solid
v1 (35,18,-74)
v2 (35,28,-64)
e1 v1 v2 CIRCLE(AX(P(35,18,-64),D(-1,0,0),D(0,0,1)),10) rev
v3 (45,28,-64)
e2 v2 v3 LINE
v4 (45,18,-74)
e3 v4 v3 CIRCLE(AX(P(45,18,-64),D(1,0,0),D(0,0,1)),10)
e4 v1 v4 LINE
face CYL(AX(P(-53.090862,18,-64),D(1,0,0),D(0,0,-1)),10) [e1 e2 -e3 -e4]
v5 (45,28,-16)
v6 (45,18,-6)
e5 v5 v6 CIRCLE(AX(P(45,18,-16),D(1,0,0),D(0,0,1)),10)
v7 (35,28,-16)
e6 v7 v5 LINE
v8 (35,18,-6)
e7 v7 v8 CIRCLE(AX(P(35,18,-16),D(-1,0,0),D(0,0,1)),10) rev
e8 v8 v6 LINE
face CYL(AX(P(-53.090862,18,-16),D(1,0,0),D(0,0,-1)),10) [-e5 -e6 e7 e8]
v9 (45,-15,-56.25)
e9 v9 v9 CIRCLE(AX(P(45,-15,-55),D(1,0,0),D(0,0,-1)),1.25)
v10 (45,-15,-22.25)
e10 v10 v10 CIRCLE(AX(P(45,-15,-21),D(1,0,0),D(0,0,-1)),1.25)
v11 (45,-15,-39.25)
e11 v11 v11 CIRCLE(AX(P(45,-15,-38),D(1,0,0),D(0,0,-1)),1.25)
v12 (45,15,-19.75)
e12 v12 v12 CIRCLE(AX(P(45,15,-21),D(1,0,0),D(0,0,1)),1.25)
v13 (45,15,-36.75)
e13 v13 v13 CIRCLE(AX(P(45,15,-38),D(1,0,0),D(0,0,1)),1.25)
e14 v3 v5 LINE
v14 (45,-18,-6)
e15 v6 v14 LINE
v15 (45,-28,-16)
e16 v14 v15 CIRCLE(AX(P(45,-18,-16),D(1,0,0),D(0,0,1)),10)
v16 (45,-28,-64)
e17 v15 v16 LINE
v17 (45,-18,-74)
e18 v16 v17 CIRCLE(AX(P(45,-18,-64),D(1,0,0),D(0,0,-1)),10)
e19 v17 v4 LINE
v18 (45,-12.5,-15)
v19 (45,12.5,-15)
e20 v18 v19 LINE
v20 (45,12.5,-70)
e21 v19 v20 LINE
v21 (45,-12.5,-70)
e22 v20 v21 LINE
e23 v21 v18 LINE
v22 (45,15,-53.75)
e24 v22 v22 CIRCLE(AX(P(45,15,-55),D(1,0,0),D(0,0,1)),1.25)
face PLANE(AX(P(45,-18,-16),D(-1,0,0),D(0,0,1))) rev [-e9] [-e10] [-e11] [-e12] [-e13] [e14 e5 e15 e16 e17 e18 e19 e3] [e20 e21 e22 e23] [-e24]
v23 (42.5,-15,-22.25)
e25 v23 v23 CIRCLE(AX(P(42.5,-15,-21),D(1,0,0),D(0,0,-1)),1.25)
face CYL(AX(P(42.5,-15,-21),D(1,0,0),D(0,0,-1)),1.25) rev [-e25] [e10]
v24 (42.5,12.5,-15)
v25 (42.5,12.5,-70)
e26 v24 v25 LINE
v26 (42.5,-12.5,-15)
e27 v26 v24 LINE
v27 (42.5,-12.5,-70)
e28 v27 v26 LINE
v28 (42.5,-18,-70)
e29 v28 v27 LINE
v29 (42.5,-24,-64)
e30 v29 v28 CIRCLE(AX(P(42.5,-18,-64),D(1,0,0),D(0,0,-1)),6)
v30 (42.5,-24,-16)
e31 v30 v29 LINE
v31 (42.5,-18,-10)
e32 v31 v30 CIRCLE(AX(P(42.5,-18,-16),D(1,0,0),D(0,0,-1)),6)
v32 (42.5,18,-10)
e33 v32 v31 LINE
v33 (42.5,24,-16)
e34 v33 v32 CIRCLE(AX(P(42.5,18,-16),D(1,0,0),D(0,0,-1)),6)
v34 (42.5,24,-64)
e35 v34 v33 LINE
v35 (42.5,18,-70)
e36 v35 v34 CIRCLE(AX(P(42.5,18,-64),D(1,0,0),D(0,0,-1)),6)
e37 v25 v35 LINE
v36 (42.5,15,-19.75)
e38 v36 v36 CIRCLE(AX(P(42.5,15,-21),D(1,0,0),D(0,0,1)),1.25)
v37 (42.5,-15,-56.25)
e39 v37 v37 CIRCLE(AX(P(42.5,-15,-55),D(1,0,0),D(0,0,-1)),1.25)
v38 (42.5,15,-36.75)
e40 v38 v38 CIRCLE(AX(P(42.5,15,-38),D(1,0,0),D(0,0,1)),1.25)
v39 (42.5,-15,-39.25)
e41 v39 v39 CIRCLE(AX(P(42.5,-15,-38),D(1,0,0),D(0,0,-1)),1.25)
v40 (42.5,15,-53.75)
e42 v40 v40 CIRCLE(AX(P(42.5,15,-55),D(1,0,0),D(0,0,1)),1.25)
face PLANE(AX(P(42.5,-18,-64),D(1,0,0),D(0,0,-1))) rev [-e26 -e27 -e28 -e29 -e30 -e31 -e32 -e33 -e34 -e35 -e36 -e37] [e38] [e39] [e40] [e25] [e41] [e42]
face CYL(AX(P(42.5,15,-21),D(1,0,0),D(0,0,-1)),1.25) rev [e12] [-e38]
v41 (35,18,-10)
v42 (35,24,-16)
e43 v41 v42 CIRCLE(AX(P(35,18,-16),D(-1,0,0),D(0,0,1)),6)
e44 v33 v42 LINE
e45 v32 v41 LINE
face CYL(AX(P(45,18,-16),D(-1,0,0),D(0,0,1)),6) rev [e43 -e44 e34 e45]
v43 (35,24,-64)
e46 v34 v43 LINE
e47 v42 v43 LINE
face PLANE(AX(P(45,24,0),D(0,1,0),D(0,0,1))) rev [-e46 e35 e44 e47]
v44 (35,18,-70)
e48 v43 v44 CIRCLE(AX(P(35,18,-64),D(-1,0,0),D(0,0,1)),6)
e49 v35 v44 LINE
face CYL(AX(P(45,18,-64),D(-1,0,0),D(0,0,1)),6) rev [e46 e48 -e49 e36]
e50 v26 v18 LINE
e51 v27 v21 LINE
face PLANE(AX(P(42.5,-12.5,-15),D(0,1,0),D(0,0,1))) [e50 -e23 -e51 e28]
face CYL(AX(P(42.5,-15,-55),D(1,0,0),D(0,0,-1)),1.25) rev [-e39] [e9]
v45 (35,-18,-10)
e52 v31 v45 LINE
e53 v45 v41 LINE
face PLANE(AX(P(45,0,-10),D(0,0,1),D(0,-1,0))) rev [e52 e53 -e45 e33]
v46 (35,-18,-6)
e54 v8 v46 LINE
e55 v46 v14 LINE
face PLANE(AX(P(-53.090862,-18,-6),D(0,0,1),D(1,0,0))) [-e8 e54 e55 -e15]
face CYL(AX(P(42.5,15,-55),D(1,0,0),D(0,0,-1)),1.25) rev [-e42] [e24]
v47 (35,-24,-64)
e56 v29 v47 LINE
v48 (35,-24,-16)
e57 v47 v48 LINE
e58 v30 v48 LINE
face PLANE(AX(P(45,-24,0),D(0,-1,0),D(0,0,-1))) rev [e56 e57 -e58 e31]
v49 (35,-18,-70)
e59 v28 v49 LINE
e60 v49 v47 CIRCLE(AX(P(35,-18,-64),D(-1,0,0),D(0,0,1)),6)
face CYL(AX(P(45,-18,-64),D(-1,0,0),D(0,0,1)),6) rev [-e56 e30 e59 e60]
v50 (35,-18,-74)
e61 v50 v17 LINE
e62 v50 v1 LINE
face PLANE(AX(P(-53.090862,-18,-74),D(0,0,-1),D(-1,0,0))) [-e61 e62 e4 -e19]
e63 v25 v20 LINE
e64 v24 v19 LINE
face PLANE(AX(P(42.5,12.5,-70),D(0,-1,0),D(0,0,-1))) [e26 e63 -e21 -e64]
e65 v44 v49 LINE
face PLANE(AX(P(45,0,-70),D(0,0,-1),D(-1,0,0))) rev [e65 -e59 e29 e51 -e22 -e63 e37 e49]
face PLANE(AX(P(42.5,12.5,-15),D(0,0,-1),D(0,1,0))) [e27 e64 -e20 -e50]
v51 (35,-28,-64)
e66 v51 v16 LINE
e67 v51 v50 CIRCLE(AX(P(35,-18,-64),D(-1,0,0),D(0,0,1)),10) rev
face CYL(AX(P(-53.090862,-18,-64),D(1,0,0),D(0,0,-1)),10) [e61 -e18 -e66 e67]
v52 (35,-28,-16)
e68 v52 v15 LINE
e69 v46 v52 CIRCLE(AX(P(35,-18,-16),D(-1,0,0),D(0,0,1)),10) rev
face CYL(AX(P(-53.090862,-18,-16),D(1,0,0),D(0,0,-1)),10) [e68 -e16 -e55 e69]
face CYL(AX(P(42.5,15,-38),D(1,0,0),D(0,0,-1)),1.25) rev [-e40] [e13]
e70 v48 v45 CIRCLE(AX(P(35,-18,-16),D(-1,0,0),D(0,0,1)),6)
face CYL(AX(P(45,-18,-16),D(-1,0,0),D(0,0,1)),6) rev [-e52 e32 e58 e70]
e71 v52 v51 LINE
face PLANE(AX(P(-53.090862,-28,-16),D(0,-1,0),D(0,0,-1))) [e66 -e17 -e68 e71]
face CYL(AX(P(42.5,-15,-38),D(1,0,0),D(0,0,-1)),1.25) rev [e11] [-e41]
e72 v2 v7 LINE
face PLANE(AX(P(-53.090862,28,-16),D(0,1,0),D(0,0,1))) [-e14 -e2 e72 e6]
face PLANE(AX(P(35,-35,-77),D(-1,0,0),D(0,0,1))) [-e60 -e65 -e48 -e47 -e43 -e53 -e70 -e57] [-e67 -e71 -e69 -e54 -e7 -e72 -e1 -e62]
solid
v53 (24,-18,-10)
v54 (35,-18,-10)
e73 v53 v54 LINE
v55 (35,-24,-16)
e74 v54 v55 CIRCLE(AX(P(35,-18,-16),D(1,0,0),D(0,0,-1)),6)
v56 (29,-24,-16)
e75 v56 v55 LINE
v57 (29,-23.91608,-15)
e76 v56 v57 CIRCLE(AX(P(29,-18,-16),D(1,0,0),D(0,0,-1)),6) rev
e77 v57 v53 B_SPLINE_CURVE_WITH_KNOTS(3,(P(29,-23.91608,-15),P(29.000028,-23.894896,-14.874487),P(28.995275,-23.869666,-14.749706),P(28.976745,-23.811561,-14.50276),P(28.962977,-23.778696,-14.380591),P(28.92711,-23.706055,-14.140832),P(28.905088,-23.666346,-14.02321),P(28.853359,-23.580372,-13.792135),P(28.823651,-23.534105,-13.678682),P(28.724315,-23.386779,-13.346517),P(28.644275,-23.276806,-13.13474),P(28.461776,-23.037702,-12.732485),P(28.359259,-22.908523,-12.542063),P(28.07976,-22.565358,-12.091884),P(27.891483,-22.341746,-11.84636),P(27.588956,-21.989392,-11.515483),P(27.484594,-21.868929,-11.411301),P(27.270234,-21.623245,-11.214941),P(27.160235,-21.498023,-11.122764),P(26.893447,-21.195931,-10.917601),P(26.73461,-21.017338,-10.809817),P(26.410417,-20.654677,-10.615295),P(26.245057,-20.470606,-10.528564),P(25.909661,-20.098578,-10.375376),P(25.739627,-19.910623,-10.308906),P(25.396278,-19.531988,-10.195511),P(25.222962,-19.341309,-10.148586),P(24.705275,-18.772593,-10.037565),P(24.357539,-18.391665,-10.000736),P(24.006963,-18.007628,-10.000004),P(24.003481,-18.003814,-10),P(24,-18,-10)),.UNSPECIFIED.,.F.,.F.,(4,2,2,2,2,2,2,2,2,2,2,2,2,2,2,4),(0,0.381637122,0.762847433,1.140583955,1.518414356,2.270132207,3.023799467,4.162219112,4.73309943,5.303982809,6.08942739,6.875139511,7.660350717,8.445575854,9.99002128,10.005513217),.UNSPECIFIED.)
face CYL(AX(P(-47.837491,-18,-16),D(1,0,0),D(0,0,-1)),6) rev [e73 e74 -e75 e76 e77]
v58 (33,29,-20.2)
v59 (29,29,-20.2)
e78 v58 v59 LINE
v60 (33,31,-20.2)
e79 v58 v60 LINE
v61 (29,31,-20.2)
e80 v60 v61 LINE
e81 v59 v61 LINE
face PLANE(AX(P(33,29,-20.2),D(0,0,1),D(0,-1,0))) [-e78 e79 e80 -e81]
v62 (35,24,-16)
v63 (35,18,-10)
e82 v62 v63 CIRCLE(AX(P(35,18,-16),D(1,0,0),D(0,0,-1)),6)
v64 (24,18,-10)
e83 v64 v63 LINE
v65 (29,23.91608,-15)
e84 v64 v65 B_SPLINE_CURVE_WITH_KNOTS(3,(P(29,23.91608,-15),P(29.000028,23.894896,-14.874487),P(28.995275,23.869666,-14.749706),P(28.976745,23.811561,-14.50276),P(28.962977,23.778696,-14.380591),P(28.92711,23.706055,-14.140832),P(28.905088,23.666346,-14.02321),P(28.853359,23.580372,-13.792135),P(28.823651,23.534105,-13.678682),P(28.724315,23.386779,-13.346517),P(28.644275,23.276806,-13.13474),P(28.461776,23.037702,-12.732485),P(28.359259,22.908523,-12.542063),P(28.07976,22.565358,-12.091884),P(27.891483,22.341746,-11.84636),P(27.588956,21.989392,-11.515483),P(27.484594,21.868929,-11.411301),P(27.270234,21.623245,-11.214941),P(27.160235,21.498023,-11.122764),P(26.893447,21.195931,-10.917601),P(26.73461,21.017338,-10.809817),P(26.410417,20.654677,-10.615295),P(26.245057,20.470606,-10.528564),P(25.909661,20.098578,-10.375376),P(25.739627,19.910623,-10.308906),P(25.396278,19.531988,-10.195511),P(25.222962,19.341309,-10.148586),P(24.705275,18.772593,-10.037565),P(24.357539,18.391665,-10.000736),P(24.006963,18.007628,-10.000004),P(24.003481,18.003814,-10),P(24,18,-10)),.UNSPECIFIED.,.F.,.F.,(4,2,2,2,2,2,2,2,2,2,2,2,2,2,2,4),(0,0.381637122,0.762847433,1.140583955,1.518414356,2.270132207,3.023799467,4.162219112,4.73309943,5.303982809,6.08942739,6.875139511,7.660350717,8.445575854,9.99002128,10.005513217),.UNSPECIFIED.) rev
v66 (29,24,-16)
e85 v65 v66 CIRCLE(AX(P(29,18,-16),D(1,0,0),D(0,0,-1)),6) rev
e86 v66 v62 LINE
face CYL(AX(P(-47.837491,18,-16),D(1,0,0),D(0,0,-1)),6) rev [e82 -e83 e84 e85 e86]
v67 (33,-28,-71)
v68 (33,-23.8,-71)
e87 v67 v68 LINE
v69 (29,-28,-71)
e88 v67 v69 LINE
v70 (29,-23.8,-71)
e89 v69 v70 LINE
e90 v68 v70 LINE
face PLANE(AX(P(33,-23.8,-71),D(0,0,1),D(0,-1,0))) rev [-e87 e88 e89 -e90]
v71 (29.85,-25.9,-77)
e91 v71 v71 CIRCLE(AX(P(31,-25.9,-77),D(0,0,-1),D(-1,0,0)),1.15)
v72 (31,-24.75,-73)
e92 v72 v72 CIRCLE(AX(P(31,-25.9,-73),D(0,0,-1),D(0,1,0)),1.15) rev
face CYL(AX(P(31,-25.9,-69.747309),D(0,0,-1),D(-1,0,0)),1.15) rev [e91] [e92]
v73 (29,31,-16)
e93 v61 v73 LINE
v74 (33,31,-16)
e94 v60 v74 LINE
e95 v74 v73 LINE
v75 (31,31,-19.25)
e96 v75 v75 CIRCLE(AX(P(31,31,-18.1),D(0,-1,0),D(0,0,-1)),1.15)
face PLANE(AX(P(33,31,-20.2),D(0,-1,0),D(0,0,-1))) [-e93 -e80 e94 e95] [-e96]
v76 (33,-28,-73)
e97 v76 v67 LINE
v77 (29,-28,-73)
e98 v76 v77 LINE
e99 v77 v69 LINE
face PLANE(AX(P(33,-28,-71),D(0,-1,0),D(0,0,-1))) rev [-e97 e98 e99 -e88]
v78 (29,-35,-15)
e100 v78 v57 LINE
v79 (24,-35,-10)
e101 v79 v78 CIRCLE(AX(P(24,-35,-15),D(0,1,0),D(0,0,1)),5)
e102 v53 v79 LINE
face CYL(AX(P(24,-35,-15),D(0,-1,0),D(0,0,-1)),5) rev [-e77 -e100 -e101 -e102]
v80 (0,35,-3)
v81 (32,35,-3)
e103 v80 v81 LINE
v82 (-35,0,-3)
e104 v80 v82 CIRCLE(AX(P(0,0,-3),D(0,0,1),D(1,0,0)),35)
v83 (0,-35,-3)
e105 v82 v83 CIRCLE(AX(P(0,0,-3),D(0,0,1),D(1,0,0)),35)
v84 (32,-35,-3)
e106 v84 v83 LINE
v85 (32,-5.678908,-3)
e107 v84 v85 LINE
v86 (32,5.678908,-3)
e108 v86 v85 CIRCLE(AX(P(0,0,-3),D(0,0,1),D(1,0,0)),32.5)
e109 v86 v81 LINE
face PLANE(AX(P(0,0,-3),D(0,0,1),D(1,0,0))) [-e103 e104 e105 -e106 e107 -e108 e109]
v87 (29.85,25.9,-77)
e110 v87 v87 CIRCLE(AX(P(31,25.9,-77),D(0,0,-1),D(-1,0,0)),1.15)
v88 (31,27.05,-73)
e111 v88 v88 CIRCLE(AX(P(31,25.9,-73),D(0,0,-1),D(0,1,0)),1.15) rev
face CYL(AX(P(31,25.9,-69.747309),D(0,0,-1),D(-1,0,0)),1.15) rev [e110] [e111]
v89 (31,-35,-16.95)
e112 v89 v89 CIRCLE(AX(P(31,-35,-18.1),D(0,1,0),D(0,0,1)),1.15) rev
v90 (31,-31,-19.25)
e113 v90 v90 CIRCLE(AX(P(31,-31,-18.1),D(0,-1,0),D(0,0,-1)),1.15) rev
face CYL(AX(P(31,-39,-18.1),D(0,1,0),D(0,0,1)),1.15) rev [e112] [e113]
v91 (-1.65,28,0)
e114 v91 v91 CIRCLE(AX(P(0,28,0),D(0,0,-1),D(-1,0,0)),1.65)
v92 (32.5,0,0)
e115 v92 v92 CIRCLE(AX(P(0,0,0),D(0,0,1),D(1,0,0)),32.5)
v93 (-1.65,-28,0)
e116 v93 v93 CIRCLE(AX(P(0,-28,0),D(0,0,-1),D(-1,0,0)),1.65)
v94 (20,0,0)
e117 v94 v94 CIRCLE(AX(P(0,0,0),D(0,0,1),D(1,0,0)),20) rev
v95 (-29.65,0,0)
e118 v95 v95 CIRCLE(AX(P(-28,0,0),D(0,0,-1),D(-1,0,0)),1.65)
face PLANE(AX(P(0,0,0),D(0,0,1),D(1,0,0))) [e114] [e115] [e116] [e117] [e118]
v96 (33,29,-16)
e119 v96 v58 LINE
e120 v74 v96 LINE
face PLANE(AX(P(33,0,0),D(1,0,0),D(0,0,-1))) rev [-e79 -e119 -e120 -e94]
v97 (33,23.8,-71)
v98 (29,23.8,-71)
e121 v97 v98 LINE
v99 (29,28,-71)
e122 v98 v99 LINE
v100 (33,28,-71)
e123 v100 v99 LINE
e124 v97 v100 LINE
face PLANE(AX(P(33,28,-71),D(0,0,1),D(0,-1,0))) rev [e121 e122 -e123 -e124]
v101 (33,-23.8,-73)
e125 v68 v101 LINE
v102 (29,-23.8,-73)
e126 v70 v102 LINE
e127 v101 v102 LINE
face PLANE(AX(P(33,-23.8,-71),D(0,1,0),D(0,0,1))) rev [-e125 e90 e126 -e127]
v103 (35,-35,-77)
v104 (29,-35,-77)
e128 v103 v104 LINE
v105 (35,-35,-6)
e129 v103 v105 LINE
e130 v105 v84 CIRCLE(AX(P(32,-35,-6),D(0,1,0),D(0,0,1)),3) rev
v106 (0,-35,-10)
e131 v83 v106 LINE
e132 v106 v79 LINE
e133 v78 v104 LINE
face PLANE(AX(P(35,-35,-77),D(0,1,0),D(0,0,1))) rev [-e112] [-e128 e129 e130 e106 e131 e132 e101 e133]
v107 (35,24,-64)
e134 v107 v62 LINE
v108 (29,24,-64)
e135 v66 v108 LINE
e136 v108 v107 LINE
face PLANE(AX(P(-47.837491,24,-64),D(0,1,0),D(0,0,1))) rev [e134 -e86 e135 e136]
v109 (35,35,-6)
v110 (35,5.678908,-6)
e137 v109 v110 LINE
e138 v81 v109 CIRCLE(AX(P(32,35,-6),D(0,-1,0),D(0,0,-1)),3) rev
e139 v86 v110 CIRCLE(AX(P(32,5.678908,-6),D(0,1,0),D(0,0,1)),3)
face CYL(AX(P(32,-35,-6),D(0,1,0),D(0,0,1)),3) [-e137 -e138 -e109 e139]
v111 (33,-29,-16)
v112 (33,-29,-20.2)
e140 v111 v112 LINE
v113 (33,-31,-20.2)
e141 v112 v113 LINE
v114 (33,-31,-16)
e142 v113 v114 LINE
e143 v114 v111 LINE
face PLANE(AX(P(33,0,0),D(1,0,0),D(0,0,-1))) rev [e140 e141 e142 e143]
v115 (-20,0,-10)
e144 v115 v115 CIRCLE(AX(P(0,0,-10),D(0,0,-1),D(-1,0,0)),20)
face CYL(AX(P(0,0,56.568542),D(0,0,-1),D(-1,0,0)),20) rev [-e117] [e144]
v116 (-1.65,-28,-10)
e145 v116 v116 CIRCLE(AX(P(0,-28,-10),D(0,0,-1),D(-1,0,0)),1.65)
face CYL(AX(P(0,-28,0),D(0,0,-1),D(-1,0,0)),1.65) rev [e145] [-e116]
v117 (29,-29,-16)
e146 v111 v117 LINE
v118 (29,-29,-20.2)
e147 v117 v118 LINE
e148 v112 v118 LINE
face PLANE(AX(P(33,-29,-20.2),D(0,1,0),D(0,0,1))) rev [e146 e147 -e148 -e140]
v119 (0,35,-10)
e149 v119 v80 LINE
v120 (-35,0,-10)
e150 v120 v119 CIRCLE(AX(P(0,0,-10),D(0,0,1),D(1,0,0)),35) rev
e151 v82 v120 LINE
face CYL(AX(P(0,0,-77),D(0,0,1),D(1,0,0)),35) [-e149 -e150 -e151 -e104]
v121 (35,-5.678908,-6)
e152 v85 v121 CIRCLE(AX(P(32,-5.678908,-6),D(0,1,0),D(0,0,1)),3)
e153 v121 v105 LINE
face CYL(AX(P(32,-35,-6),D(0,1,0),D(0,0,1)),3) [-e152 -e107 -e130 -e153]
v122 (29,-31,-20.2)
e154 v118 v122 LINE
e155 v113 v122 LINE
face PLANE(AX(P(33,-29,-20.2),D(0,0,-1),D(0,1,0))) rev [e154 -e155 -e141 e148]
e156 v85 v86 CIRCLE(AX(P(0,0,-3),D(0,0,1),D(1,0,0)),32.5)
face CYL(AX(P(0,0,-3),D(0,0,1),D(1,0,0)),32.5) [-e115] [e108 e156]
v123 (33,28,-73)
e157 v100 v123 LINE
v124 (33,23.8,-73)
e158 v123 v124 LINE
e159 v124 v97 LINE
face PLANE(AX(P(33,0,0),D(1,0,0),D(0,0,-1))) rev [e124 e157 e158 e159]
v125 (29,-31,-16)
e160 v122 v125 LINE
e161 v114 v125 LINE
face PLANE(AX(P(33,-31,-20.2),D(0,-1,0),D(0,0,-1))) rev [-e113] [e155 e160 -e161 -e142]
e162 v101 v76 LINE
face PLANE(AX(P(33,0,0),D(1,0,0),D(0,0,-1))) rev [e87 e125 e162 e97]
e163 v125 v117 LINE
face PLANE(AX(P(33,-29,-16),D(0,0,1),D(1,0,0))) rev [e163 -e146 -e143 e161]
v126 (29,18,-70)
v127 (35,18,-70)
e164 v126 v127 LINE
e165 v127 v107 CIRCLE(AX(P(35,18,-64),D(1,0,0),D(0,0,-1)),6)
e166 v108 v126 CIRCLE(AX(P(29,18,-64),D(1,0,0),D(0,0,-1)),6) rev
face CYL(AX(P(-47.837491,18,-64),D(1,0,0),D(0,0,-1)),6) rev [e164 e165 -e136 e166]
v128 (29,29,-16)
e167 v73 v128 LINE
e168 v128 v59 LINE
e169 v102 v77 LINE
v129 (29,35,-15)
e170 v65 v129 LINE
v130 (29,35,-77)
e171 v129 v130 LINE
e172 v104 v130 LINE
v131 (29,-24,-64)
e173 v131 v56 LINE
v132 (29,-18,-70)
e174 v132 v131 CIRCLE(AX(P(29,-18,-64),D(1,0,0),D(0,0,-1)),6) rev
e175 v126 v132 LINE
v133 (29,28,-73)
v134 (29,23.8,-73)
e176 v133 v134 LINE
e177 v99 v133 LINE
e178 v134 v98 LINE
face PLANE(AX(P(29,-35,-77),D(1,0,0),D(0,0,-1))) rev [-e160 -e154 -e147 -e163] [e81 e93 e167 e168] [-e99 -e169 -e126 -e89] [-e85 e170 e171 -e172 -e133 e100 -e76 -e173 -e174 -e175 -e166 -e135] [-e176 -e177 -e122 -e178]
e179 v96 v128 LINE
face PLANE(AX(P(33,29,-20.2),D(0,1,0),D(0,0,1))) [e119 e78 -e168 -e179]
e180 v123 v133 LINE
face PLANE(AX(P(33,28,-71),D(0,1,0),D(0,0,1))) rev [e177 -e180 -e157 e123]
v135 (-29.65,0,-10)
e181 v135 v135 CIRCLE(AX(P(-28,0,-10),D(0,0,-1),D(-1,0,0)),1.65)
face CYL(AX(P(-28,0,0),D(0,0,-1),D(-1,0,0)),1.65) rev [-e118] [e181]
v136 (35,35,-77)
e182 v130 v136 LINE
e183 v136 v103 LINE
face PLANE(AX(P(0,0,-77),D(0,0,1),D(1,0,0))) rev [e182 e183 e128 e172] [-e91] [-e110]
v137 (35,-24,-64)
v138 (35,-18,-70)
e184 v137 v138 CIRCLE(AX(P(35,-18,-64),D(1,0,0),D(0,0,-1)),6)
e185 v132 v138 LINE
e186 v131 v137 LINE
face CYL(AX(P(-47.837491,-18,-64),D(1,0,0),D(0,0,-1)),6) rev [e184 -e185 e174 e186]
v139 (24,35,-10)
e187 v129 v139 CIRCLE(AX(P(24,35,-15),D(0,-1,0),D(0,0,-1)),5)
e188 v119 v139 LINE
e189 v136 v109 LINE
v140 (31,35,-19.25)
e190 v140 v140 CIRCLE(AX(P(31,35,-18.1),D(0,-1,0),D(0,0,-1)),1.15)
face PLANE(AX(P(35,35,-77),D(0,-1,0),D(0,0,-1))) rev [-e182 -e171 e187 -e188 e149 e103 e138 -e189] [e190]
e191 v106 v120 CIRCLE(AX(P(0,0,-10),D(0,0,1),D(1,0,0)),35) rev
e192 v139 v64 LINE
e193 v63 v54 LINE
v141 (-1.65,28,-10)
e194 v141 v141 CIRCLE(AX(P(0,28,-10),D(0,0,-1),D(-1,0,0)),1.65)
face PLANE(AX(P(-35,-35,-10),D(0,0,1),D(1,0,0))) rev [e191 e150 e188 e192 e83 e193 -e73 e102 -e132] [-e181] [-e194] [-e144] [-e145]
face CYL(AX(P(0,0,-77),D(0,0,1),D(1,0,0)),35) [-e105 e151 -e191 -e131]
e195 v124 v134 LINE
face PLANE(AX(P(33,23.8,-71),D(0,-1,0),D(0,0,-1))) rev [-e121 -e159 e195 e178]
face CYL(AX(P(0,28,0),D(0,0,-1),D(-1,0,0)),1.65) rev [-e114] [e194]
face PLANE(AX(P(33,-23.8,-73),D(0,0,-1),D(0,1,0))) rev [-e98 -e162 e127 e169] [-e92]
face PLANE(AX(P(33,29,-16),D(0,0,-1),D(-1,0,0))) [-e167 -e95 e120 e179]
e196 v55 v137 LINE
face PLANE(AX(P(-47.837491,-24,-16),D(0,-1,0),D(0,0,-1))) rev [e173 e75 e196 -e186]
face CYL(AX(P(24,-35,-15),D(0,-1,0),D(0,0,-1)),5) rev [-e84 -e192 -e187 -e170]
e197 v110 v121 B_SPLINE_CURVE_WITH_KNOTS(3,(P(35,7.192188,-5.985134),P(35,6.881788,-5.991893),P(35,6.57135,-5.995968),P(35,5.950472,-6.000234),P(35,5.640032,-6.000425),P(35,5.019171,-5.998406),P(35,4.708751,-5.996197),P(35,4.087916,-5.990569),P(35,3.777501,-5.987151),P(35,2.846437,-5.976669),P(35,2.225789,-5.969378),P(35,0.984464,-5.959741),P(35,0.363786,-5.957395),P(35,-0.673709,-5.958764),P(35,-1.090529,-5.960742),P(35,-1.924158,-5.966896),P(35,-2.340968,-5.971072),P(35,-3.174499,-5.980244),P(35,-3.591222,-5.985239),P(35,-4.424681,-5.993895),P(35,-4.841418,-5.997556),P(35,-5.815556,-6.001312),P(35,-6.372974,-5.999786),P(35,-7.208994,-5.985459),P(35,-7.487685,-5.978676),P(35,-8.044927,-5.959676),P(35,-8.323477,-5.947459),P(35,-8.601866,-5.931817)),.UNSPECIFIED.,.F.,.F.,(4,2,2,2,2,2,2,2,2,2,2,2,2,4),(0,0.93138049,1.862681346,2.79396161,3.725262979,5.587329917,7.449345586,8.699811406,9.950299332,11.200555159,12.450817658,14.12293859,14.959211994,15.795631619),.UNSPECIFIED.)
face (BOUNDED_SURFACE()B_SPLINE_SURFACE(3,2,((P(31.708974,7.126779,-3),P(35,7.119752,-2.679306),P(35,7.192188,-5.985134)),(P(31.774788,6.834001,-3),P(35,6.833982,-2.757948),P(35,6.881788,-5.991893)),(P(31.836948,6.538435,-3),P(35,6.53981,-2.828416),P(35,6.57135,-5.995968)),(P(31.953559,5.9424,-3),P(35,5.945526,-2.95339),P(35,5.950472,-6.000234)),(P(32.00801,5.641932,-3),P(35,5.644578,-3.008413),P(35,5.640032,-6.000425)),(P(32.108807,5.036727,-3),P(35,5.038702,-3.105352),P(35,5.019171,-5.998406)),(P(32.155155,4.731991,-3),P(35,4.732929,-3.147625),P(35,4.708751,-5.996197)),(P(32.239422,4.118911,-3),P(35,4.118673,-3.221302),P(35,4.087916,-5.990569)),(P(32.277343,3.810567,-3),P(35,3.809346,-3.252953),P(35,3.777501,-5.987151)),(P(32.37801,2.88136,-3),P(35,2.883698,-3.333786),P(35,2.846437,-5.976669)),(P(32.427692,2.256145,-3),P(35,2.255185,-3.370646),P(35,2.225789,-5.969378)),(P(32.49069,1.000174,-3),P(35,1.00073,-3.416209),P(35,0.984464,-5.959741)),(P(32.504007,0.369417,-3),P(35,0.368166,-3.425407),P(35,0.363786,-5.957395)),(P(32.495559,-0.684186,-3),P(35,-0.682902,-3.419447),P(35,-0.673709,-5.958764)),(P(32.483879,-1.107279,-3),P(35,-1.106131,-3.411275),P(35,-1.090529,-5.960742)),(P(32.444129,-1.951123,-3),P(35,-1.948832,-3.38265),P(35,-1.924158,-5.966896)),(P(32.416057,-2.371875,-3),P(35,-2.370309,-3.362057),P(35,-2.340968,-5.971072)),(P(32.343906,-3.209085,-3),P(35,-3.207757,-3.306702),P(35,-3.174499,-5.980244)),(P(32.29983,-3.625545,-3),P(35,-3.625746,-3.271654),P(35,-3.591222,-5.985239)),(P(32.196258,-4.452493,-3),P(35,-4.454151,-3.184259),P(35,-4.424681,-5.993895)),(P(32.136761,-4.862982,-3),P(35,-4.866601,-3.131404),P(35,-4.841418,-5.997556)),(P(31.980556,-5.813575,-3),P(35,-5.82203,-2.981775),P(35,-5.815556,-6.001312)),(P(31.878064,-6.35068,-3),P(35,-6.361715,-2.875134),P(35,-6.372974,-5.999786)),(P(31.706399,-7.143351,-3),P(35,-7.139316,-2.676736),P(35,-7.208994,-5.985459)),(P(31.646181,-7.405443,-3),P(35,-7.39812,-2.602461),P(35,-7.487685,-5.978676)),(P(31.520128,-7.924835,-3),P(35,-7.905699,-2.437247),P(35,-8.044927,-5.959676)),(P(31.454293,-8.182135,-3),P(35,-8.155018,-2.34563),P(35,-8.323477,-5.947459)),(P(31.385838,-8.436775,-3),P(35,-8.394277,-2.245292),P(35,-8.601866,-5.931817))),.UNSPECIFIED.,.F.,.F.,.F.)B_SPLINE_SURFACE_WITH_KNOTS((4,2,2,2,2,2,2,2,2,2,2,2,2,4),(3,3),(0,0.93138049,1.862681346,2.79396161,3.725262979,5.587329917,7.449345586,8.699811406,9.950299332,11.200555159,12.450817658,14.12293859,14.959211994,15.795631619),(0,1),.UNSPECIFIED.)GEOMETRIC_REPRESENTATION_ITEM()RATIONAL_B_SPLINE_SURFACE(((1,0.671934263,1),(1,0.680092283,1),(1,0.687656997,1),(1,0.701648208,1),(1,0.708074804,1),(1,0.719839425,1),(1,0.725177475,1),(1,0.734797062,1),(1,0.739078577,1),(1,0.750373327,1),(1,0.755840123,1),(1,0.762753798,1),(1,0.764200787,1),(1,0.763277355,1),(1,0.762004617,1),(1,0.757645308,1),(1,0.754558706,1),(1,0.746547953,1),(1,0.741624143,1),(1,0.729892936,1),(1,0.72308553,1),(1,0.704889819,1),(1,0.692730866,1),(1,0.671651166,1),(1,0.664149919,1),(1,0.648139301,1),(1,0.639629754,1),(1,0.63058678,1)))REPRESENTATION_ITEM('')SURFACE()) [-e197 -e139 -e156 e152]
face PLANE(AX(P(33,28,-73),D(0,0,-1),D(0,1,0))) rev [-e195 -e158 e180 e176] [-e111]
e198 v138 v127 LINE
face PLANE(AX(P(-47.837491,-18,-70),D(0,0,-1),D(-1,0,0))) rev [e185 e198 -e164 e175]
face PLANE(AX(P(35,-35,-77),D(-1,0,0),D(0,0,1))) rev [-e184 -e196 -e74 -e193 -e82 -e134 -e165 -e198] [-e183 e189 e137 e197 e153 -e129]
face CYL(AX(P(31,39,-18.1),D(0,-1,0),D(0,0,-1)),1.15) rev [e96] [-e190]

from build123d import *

# Parameters (mm, degrees)
SKETCH1_R           = 32.5
BOSS_EXTRUDE1_DEPTH = 3
SKETCH10_W          = 70
SKETCH10_H          = 70
BOSS_EXTRUDE6_DEPTH = 74
BOSS_EXTRUDE2_DEPTH = 10
SKETCH11_W          = 64
SKETCH11_H          = 67
CUT_EXTRUDE5_DEPTH  = 114.375482358
CUT_EXTRUDE2_DEPTH  = 110.79070999
SKETCH5_R           = 1.25
BOSS_EXTRUDE3_DEPTH = 2.5
CUT_EXTRUDE6_DEPTH  = 6
FILLET1_R           = 3
SKETCH17_R          = 1.65
CUT_EXTRUDE9_DEPTH  = 88.971586438
SKETCH19_W          = 2
SKETCH19_H          = 4.2
CUT_EXTRUDE10_DEPTH = 4
SKETCH21_W          = 2
SKETCH21_H          = 4.2
CUT_EXTRUDE11_DEPTH = 4
SKETCH22_R          = 1.15
CUT_EXTRUDE12_DEPTH = 4
SKETCH24_R          = 20
CUT_EXTRUDE14_DEPTH = 10
FILLET4_START       = -35
FILLET4_DEPTH       = 17.0000001
FILLET4_START_2     = 17.9999999
FILLET4_2_DEPTH     = 17.0000001
FILLET4_START_3     = 23.9999999
FILLET4_3_DEPTH     = 5.0000001
FILLET6_R           = 35
SKETCH25_W          = 4.2
SKETCH25_H          = 2
CUT_EXTRUDE15_DEPTH = 4
SKETCH26_R          = 1.15
CUT_EXTRUDE16_DEPTH = 10


with BuildPart() as part:
    # Sketch1 → Boss-Extrude1 (new body)
    with BuildSketch(Plane.XY):
        Circle(SKETCH1_R)
    extrude(amount=-BOSS_EXTRUDE1_DEPTH)

    # Sketch10 → Boss-Extrude6 (add)
    with BuildSketch(Plane(origin=(0, 0, -3), x_dir=(-1, 0, 0), z_dir=(0, 0, -1))):
        Rectangle(SKETCH10_W, SKETCH10_H)
    extrude(amount=BOSS_EXTRUDE6_DEPTH)

    # Sketch11 → Cut-Extrude5 (cut, through all)
    with BuildSketch(Plane(origin=(0, 35, 0), x_dir=(1, 0, 0), z_dir=(0, 1, 0))):
        with Locations((-3, 43.5)):
            Rectangle(SKETCH11_W, SKETCH11_H)
    extrude(amount=-CUT_EXTRUDE5_DEPTH, mode=Mode.SUBTRACT)

    # Sketch13 → Cut-Extrude6 (cut)
    with BuildSketch(Plane(origin=(35, 0, 0), x_dir=(0, 0, -1), z_dir=(1, 0, 0))):
        with BuildLine():
            Line((10, 18), (10, -18))
            ThreePointArc((10, -18), (11.757359313, -22.242640687), (16, -24))
            Line((16, -24), (64, -24))
            ThreePointArc((64, -24), (68.242640687, -22.242640687), (70, -18))
            Line((70, -18), (70, 18))
            ThreePointArc((70, 18), (68.242640687, 22.242640687), (64, 24))
            Line((64, 24), (16, 24))
            ThreePointArc((16, 24), (11.757359313, 22.242640687), (10, 18))
        make_face()
    extrude(amount=-CUT_EXTRUDE6_DEPTH, mode=Mode.SUBTRACT)

    # Fillet1
    fillet1_edges = [part.edges().sort_by_distance(p)[0] for p in [
        (35, 0, -3),
    ]]
    fillet(fillet1_edges, radius=FILLET1_R)

    # Sketch17 → Cut-Extrude9 (cut, through all)
    with BuildSketch(Plane(origin=(0, 0, -10), x_dir=(-1, 0, 0), z_dir=(0, 0, -1))):
        with Locations((0, 28)):
            Circle(SKETCH17_R)
        with Locations((28, 0)):
            Circle(SKETCH17_R)
        with Locations((0, -28)):
            Circle(SKETCH17_R)
    extrude(amount=-CUT_EXTRUDE9_DEPTH, mode=Mode.SUBTRACT)

    # Sketch19 → Cut-Extrude10 (cut)
    with BuildSketch(Plane.ZY.offset(-29)):
        with Locations((-72, 25.9)):
            Rectangle(SKETCH19_W, SKETCH19_H)
        with Locations((-72, -25.9)):
            Rectangle(SKETCH19_W, SKETCH19_H)
    extrude(amount=-CUT_EXTRUDE10_DEPTH, mode=Mode.SUBTRACT)

    # Sketch21 → Cut-Extrude11 (cut)
    with BuildSketch(Plane(origin=(0, 0, -10), x_dir=(-1, 0, 0), z_dir=(0, 0, -1))):
        with Locations((30, 25.9)):
            Rectangle(SKETCH21_W, SKETCH21_H)
        with Locations((30, -25.9)):
            Rectangle(SKETCH21_W, SKETCH21_H)
    extrude(amount=-CUT_EXTRUDE11_DEPTH, mode=Mode.SUBTRACT)

    # Sketch22 → Cut-Extrude12 (cut)
    with BuildSketch(Plane(origin=(0, 0, -77), x_dir=(-1, 0, 0), z_dir=(0, 0, -1))):
        with Locations((-31, 25.9)):
            Circle(SKETCH22_R)
        with Locations((-31, -25.9)):
            Circle(SKETCH22_R)
    extrude(amount=-CUT_EXTRUDE12_DEPTH, mode=Mode.SUBTRACT)

    # Sketch24 → Cut-Extrude14 (cut)
    with BuildSketch(Plane(origin=(0, 0, -10), x_dir=(-1, 0, 0), z_dir=(0, 0, -1))):
        Circle(SKETCH24_R)
    extrude(amount=-CUT_EXTRUDE14_DEPTH, mode=Mode.SUBTRACT)

    # Fillet4: read off the stored shape, not the designer's step
    # Fillet4 outline → Fillet4 (add)
    with BuildSketch(Plane(origin=(0, 0, 0), x_dir=(1, 0, 0), z_dir=(0, 1, 0)).offset(FILLET4_START)):
        with BuildLine():
            Line((29, 10), (29, 15))
            ThreePointArc((29, 15), (27.535533906, 11.464466094), (24, 10))
            Line((24, 10), (29, 10))
        make_face()
    extrude(amount=FILLET4_DEPTH)

    # Fillet4 2 outline → Fillet4 2 (add)
    with BuildSketch(Plane(origin=(0, 0, 0), x_dir=(1, 0, 0), z_dir=(0, 1, 0)).offset(FILLET4_START_2)):
        with BuildLine():
            Line((29, 10), (29, 15))
            ThreePointArc((29, 15), (27.535533906, 11.464466094), (24, 10))
            Line((24, 10), (29, 10))
        make_face()
    extrude(amount=FILLET4_2_DEPTH)

    # Fillet4 3 outline → Fillet4 3 (cut)
    with BuildSketch(Plane.YZ.offset(FILLET4_START_3)):
        with BuildLine():
            Line((17.9999999, -16), (24, -16))
            ThreePointArc((24, -16), (22.242640687, -11.757359313), (18, -10))
            Line((18, -10), (17.9999999, -16))
        make_face()
        with BuildLine():
            Line((-24, -16), (-17.9999999, -16))
            Line((-17.9999999, -16), (-18, -10))
            ThreePointArc((-18, -10), (-22.242640687, -11.757359313), (-24, -16))
        make_face()
    extrude(amount=FILLET4_3_DEPTH, mode=Mode.SUBTRACT)

    # Fillet6
    fillet6_edges = [part.edges().sort_by_distance(p)[0] for p in [
        (-35, -35, -6.5),
        (-35, 35, -6.5),
    ]]
    fillet(fillet6_edges, radius=FILLET6_R - 0.0001)  # a hair under: the kernel refuses the full size

    # Sketch25 → Cut-Extrude15 (cut)
    with BuildSketch(Plane(origin=(29, 0, 19), x_dir=(0, 0, 1), z_dir=(-1, 0, 0))):
        with Locations((-37.1, -30)):
            Rectangle(SKETCH25_W, SKETCH25_H)
    cut_extrude15 = extrude(amount=-CUT_EXTRUDE15_DEPTH, mode=Mode.SUBTRACT)

    # Sketch26 → Cut-Extrude16 (cut)
    with BuildSketch(Plane.XZ.offset(29)):
        with Locations(Location((31, -18.1, 0), (0, 0, 90))):
            Circle(SKETCH26_R)
    cut_extrude16 = extrude(amount=CUT_EXTRUDE16_DEPTH, mode=Mode.SUBTRACT)

    # Mirror1: Cut-Extrude15, Cut-Extrude16 across plane
    add(cut_extrude15.mirror(Plane(origin=(0, 0, 0), x_dir=(0, 0, 1), z_dir=(0, -1, 0))), mode=Mode.SUBTRACT)
    add(cut_extrude16.mirror(Plane(origin=(0, 0, 0), x_dir=(0, 0, 1), z_dir=(0, -1, 0))), mode=Mode.SUBTRACT)


with BuildPart() as body_2:
    # Sketch2 → Boss-Extrude2 (new body)
    with BuildSketch(Plane(origin=(45, 0, 0), x_dir=(0, 0, -1), z_dir=(1, 0, 0))):
        with BuildLine():
            Line((16, -28), (64, -28))
            ThreePointArc((64, -28), (71.071067812, -25.071067812), (74, -18))
            Line((74, -18), (74, 18))
            ThreePointArc((74, 18), (71.071067812, 25.071067812), (64, 28))
            Line((64, 28), (16, 28))
            ThreePointArc((16, 28), (8.928932188, 25.071067812), (6, 18))
            Line((6, 18), (6, -18))
            ThreePointArc((6, -18), (8.928932188, -25.071067812), (16, -28))
        make_face()
    extrude(amount=-BOSS_EXTRUDE2_DEPTH)

    # Sketch4 → Cut-Extrude2 (cut, through all)
    with BuildSketch(Plane.ZY.offset(-35)):
        with BuildLine():
            Line((-64, -24), (-16, -24))
            ThreePointArc((-16, -24), (-11.757359313, -22.242640687), (-10, -18))
            Line((-10, -18), (-10, 18))
            ThreePointArc((-10, 18), (-11.757359313, 22.242640687), (-16, 24))
            Line((-16, 24), (-64, 24))
            ThreePointArc((-64, 24), (-68.242640687, 22.242640687), (-70, 18))
            Line((-70, 18), (-70, -18))
            ThreePointArc((-70, -18), (-68.242640687, -22.242640687), (-64, -24))
        make_face()
    extrude(amount=-CUT_EXTRUDE2_DEPTH, mode=Mode.SUBTRACT)

    # Sketch5 → Boss-Extrude3 (add)
    with BuildSketch(Plane(origin=(45, 0, 0), x_dir=(0, 0, -1), z_dir=(1, 0, 0))):
        with BuildLine():
            Line((70, 18), (70, 12.5))
            Line((70, 12.5), (15, 12.5))
            Line((15, 12.5), (15, -12.5))
            Line((15, -12.5), (70, -12.5))
            Line((70, -12.5), (70, -18))
            ThreePointArc((70, -18), (68.242640687, -22.242640687), (64, -24))
            Line((64, -24), (16, -24))
            ThreePointArc((16, -24), (11.757359313, -22.242640687), (10, -18))
            Line((10, -18), (10, 18))
            ThreePointArc((10, 18), (11.757359313, 22.242640687), (16, 24))
            Line((16, 24), (64, 24))
            ThreePointArc((64, 24), (68.242640687, 22.242640687), (70, 18))
        make_face()
        with Locations(Location((55, 15, 0), (0, 0, 180))):
            Circle(SKETCH5_R, mode=Mode.SUBTRACT)
        with Locations((38, -15)):
            Circle(SKETCH5_R, mode=Mode.SUBTRACT)
        with Locations((21, -15)):
            Circle(SKETCH5_R, mode=Mode.SUBTRACT)
        with Locations(Location((38, 15, 0), (0, 0, 180))):
            Circle(SKETCH5_R, mode=Mode.SUBTRACT)
        with Locations(Location((21, 15, 0), (0, 0, 180))):
            Circle(SKETCH5_R, mode=Mode.SUBTRACT)
        with Locations((55, -15)):
            Circle(SKETCH5_R, mode=Mode.SUBTRACT)
    extrude(amount=-BOSS_EXTRUDE3_DEPTH)


solid = Compound([part.part, body_2.part])
